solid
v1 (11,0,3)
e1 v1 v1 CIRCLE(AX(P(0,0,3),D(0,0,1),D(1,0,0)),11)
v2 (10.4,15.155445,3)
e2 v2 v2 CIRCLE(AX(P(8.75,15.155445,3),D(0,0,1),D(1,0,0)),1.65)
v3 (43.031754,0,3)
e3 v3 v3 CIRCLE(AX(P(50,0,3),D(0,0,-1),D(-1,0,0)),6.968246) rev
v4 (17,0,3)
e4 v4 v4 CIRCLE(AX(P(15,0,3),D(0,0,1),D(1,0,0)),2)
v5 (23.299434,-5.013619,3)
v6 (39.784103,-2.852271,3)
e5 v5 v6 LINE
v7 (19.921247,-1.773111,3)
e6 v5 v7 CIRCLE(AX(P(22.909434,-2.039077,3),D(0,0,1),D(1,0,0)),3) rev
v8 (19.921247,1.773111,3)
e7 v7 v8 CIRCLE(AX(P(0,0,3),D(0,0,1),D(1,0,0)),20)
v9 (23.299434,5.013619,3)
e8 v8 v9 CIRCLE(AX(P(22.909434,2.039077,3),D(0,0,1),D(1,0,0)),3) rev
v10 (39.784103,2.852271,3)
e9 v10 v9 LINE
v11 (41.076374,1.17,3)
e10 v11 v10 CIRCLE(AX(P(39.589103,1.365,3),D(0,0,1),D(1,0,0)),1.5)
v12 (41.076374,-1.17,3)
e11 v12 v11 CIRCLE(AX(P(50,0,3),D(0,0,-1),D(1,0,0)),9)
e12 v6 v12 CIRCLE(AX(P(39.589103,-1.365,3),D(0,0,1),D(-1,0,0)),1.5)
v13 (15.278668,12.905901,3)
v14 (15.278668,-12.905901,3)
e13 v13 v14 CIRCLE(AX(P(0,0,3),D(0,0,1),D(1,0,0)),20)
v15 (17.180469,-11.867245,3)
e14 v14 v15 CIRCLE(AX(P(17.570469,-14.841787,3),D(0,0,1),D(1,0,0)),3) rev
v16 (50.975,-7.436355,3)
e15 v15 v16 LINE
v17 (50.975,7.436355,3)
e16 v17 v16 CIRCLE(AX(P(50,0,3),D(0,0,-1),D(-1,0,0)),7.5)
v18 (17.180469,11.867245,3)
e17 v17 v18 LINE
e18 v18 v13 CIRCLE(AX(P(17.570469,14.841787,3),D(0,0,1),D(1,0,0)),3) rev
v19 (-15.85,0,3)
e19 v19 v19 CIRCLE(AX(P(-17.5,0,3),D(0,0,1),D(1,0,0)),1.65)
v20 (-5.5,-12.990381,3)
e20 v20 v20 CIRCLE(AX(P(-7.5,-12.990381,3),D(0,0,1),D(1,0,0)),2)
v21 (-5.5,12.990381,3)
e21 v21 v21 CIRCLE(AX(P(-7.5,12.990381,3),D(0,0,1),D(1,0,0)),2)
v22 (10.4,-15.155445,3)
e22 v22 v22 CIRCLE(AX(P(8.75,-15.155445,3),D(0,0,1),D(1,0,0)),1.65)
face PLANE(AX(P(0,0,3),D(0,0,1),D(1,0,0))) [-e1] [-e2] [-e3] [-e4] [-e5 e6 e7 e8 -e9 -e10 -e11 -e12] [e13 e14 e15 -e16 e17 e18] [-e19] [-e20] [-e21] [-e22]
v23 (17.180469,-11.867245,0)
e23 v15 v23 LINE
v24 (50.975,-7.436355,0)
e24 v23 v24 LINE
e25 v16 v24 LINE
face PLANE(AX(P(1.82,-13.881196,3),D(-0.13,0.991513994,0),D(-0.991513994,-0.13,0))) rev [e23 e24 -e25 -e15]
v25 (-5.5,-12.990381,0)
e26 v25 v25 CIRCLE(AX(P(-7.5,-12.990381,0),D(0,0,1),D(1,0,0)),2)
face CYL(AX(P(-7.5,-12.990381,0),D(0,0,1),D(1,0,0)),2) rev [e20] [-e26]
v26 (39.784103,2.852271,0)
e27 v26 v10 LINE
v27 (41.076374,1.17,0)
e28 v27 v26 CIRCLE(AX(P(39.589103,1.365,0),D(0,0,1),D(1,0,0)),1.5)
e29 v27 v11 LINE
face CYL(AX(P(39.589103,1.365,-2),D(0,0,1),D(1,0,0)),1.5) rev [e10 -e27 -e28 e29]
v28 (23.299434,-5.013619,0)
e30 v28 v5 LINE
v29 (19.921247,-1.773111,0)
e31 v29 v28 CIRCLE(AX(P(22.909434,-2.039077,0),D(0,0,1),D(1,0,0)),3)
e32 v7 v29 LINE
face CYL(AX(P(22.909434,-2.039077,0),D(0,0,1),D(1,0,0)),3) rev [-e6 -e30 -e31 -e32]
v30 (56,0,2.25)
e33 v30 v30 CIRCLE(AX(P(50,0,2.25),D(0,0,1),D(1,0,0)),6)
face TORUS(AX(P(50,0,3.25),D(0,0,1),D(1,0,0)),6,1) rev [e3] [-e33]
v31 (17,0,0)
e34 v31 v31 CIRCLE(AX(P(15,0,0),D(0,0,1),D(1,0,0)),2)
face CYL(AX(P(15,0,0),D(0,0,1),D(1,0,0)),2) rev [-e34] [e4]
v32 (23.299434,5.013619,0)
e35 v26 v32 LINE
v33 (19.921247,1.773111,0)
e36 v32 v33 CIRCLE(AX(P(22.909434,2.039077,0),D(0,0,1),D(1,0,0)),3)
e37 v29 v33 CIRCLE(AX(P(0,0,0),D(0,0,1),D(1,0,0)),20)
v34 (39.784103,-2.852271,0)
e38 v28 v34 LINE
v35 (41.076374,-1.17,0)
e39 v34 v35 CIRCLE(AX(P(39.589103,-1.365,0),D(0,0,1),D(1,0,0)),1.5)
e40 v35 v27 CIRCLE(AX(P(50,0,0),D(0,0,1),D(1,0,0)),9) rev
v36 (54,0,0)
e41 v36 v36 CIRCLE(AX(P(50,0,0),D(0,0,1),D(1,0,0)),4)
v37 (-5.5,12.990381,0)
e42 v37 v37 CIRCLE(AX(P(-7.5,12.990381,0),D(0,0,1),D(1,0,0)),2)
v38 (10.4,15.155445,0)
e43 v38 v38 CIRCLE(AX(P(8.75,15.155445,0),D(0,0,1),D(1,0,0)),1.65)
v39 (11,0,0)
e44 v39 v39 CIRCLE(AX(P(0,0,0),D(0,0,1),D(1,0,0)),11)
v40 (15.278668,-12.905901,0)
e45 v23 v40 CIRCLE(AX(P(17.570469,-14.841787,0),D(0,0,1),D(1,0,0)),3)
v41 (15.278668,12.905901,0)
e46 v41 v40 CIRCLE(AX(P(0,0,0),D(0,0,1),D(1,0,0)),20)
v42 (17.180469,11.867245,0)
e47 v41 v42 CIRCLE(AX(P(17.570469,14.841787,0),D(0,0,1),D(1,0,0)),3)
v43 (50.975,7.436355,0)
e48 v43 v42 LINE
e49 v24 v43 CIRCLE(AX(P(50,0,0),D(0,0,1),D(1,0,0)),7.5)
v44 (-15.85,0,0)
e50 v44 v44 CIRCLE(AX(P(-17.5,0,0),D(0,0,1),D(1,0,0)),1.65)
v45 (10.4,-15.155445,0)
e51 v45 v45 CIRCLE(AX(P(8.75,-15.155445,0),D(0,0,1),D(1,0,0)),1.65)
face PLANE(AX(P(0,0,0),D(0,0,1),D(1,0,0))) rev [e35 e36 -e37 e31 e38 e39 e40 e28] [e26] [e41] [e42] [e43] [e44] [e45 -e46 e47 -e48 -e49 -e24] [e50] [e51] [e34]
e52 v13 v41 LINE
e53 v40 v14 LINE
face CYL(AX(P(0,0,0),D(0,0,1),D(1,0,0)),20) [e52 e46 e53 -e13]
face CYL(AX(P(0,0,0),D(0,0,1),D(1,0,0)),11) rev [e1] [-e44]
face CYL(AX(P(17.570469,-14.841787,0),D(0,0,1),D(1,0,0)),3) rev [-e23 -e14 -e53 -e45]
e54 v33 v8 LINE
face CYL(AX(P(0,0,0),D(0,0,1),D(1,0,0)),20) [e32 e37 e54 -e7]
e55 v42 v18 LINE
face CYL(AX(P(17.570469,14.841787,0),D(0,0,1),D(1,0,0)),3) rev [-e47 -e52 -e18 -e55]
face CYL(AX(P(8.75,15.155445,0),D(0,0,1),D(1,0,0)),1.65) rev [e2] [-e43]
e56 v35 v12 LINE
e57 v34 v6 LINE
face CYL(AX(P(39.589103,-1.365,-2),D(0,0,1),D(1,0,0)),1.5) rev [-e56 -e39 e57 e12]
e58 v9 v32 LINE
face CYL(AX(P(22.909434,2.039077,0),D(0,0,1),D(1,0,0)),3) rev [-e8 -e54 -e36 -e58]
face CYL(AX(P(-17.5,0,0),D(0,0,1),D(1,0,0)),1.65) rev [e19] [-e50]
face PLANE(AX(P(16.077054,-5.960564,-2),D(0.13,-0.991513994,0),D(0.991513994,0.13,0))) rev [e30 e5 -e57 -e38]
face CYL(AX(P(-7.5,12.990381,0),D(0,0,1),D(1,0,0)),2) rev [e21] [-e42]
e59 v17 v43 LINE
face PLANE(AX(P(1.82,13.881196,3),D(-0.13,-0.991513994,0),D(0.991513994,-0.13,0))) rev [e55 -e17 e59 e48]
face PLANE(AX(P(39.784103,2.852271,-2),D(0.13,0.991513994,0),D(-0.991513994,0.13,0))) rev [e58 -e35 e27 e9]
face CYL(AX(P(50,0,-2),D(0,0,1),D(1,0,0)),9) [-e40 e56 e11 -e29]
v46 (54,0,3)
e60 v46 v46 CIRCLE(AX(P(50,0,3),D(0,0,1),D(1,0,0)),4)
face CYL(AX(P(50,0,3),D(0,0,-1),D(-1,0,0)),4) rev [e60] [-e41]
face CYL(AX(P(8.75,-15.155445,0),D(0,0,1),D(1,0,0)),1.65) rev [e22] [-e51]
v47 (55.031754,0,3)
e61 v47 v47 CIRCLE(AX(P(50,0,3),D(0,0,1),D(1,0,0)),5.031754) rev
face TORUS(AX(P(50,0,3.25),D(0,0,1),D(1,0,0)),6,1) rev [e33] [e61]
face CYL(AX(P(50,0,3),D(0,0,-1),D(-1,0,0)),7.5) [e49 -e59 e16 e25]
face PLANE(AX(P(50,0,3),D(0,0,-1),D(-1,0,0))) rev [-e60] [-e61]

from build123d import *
from build123d.topology import SkipClean

# Parameters (mm, degrees)
SKETCH_1_R          = 1.65
SKETCH_1_R_2        = 5
SKETCH_1_R_3        = 4
EXTRUDE_1_DEPTH     = 3
CUT_EXTRUDE_1_DEPTH = 5
CUT_EXTRUDE_START   = -2
SKETCH_3_R          = 2.55
CUT_EXTRUDE_2_DEPTH = 1
SKETCH_4_R          = 20
EXTRUDE_2_DEPTH     = 3
SKETCH_5_R          = 11
SKETCH_5_R_2        = 1.65
SKETCH_5_R_3        = 2
CUT_EXTRUDE_3_DEPTH = 61.952850631
FILLET_1_R          = 3
SKETCH_8_R          = 7.5
EXTRUDE_4_DEPTH     = 0.25
SKETCH_9_R          = 7
SKETCH_9_R_2        = 5
CUT_EXTRUDE_4_DEPTH = 1
FILLET_2_R          = 1
SKETCH_11_R         = 7.5
CUT_EXTRUDE_6_DEPTH = 0.25


with BuildPart() as part:
    # 草图1 → 凸台-拉伸1 (new body)
    with BuildSketch(Plane.XY):
        with BuildLine():
            Line((1.82, -13.881195914), (50.975, -7.436354954))
            ThreePointArc((50.975, -7.436354954), (57.5, 0), (50.975, 7.436354954))
            Line((50.975, 7.436354954), (1.82, 13.881195914))
            ThreePointArc((1.82, 13.881195914), (-14, 0), (1.82, -13.881195914))
        make_face()
        with Locations((-9, 0)):
            Circle(SKETCH_1_R, mode=Mode.SUBTRACT)
        with Locations((4.5, 7.794228634)):
            Circle(SKETCH_1_R, mode=Mode.SUBTRACT)
        with Locations((4.5, -7.794228634)):
            Circle(SKETCH_1_R, mode=Mode.SUBTRACT)
        Circle(SKETCH_1_R_2, mode=Mode.SUBTRACT)
        with Locations((50, 0)):
            Circle(SKETCH_1_R_3, mode=Mode.SUBTRACT)
    extrude(amount=EXTRUDE_1_DEPTH)

    # 草图2 → 切除-拉伸1 (cut)
    with BuildSketch(Plane.XY.offset(3)):
        with BuildLine():
            Line((16.077054233, -5.960564335), (39.784103065, -2.852270991))
            ThreePointArc((39.784103065, -2.852270991), (40.77864829, -2.278773581), (41.076374055, -1.17))
            ThreePointArc((41.076374055, -1.17), (41, 0), (41.076374055, 1.17))
            ThreePointArc((41.076374055, 1.17), (40.77864829, 2.278773581), (39.784103065, 2.852270991))
            Line((39.784103065, 2.852270991), (16.077054233, 5.960564335))
            ThreePointArc((16.077054233, 5.960564335), (14.747754312, 5.454804266), (14.438231121, 4.066630313))
            ThreePointArc((14.438231121, 4.066630313), (15, 0), (14.438231121, -4.066630313))
            ThreePointArc((14.438231121, -4.066630313), (14.747754312, -5.454804266), (16.077054233, -5.960564335))
        make_face()
    extrude(amount=-CUT_EXTRUDE_1_DEPTH, mode=Mode.SUBTRACT)

    # 草图3 → 切除-拉伸2 (cut)
    with BuildSketch(Plane.XY.offset(3).offset(CUT_EXTRUDE_START)):
        with Locations((-9, 0)):
            Circle(SKETCH_3_R)
        with Locations((4.5, 7.794228634)):
            Circle(SKETCH_3_R)
        with Locations((4.5, -7.794228634)):
            Circle(SKETCH_3_R)
    extrude(amount=-CUT_EXTRUDE_2_DEPTH, mode=Mode.SUBTRACT)

    # 草图4 → 凸台-拉伸2 (add, through all)
    with BuildSketch(Plane.XY.offset(3)):
        Circle(SKETCH_4_R)
    extrude(amount=-EXTRUDE_2_DEPTH)

    # 草图5 → 切除-拉伸3 (cut, through all)
    with BuildSketch(Plane.XY.offset(3)):
        Circle(SKETCH_5_R)
        with Locations((-17.5, 0)):
            Circle(SKETCH_5_R_2)
        with Locations((8.75, 15.155444566)):
            Circle(SKETCH_5_R_2)
        with Locations((8.75, -15.155444566)):
            Circle(SKETCH_5_R_2)
        with Locations((-7.5, 12.990381057)):
            Circle(SKETCH_5_R_3)
        with Locations((15, 0)):
            Circle(SKETCH_5_R_3)
        with Locations((-7.5, -12.990381057)):
            Circle(SKETCH_5_R_3)
    extrude(amount=-CUT_EXTRUDE_3_DEPTH, mode=Mode.SUBTRACT)

    # 圆角1
    fillet_1_edges = [part.edges().sort_by_distance(p)[0] for p in [
        (15.981652446, -12.024424522, 1.5),
        (19.214751718, -5.549172589, 1.5),
        (15.981652446, 12.024424522, 1.5),
        (19.214751718, 5.549172589, 1.5),
    ]]
    fillet(fillet_1_edges, radius=FILLET_1_R)

    # 草图8 → 凸台-拉伸4 (add)
    with SkipClean():  # the faces are left unmerged after this step: merging them gives an invalid solid
        with BuildSketch(Plane(origin=(0, 0, 3), x_dir=(-1, 0, 0), z_dir=(0, 0, -1))):
            with Locations((-50, 0)):
                Circle(SKETCH_8_R)
        extrude(amount=-EXTRUDE_4_DEPTH)

    # 草图9 → 切除-拉伸4 (cut)
    with SkipClean():  # the faces are left unmerged after this step: merging them gives an invalid solid
        with BuildSketch(Plane.XY.offset(3.25)):
            with Locations((50, 0)):
                Circle(SKETCH_9_R)
            with Locations((50, 0)):
                Circle(SKETCH_9_R_2, mode=Mode.SUBTRACT)
        extrude(amount=-CUT_EXTRUDE_4_DEPTH, mode=Mode.SUBTRACT)

    # 圆角2
    fillet_2_edges = [part.edges().sort_by_distance(p)[0] for p in [
        (43, 0, 2.25),
        (45, 0, 2.25),
    ]]
    fillet(fillet_2_edges, radius=FILLET_2_R - 0.0001)  # a hair under: the kernel refuses the full size

    # 草图11 → 切除-拉伸6 (cut)
    with BuildSketch(Plane(origin=(0, 0, 3), x_dir=(-1, 0, 0), z_dir=(0, 0, -1))):
        with Locations((-50, 0)):
            Circle(SKETCH_11_R)
    extrude(amount=-CUT_EXTRUDE_6_DEPTH, mode=Mode.SUBTRACT)


solid = part.part
